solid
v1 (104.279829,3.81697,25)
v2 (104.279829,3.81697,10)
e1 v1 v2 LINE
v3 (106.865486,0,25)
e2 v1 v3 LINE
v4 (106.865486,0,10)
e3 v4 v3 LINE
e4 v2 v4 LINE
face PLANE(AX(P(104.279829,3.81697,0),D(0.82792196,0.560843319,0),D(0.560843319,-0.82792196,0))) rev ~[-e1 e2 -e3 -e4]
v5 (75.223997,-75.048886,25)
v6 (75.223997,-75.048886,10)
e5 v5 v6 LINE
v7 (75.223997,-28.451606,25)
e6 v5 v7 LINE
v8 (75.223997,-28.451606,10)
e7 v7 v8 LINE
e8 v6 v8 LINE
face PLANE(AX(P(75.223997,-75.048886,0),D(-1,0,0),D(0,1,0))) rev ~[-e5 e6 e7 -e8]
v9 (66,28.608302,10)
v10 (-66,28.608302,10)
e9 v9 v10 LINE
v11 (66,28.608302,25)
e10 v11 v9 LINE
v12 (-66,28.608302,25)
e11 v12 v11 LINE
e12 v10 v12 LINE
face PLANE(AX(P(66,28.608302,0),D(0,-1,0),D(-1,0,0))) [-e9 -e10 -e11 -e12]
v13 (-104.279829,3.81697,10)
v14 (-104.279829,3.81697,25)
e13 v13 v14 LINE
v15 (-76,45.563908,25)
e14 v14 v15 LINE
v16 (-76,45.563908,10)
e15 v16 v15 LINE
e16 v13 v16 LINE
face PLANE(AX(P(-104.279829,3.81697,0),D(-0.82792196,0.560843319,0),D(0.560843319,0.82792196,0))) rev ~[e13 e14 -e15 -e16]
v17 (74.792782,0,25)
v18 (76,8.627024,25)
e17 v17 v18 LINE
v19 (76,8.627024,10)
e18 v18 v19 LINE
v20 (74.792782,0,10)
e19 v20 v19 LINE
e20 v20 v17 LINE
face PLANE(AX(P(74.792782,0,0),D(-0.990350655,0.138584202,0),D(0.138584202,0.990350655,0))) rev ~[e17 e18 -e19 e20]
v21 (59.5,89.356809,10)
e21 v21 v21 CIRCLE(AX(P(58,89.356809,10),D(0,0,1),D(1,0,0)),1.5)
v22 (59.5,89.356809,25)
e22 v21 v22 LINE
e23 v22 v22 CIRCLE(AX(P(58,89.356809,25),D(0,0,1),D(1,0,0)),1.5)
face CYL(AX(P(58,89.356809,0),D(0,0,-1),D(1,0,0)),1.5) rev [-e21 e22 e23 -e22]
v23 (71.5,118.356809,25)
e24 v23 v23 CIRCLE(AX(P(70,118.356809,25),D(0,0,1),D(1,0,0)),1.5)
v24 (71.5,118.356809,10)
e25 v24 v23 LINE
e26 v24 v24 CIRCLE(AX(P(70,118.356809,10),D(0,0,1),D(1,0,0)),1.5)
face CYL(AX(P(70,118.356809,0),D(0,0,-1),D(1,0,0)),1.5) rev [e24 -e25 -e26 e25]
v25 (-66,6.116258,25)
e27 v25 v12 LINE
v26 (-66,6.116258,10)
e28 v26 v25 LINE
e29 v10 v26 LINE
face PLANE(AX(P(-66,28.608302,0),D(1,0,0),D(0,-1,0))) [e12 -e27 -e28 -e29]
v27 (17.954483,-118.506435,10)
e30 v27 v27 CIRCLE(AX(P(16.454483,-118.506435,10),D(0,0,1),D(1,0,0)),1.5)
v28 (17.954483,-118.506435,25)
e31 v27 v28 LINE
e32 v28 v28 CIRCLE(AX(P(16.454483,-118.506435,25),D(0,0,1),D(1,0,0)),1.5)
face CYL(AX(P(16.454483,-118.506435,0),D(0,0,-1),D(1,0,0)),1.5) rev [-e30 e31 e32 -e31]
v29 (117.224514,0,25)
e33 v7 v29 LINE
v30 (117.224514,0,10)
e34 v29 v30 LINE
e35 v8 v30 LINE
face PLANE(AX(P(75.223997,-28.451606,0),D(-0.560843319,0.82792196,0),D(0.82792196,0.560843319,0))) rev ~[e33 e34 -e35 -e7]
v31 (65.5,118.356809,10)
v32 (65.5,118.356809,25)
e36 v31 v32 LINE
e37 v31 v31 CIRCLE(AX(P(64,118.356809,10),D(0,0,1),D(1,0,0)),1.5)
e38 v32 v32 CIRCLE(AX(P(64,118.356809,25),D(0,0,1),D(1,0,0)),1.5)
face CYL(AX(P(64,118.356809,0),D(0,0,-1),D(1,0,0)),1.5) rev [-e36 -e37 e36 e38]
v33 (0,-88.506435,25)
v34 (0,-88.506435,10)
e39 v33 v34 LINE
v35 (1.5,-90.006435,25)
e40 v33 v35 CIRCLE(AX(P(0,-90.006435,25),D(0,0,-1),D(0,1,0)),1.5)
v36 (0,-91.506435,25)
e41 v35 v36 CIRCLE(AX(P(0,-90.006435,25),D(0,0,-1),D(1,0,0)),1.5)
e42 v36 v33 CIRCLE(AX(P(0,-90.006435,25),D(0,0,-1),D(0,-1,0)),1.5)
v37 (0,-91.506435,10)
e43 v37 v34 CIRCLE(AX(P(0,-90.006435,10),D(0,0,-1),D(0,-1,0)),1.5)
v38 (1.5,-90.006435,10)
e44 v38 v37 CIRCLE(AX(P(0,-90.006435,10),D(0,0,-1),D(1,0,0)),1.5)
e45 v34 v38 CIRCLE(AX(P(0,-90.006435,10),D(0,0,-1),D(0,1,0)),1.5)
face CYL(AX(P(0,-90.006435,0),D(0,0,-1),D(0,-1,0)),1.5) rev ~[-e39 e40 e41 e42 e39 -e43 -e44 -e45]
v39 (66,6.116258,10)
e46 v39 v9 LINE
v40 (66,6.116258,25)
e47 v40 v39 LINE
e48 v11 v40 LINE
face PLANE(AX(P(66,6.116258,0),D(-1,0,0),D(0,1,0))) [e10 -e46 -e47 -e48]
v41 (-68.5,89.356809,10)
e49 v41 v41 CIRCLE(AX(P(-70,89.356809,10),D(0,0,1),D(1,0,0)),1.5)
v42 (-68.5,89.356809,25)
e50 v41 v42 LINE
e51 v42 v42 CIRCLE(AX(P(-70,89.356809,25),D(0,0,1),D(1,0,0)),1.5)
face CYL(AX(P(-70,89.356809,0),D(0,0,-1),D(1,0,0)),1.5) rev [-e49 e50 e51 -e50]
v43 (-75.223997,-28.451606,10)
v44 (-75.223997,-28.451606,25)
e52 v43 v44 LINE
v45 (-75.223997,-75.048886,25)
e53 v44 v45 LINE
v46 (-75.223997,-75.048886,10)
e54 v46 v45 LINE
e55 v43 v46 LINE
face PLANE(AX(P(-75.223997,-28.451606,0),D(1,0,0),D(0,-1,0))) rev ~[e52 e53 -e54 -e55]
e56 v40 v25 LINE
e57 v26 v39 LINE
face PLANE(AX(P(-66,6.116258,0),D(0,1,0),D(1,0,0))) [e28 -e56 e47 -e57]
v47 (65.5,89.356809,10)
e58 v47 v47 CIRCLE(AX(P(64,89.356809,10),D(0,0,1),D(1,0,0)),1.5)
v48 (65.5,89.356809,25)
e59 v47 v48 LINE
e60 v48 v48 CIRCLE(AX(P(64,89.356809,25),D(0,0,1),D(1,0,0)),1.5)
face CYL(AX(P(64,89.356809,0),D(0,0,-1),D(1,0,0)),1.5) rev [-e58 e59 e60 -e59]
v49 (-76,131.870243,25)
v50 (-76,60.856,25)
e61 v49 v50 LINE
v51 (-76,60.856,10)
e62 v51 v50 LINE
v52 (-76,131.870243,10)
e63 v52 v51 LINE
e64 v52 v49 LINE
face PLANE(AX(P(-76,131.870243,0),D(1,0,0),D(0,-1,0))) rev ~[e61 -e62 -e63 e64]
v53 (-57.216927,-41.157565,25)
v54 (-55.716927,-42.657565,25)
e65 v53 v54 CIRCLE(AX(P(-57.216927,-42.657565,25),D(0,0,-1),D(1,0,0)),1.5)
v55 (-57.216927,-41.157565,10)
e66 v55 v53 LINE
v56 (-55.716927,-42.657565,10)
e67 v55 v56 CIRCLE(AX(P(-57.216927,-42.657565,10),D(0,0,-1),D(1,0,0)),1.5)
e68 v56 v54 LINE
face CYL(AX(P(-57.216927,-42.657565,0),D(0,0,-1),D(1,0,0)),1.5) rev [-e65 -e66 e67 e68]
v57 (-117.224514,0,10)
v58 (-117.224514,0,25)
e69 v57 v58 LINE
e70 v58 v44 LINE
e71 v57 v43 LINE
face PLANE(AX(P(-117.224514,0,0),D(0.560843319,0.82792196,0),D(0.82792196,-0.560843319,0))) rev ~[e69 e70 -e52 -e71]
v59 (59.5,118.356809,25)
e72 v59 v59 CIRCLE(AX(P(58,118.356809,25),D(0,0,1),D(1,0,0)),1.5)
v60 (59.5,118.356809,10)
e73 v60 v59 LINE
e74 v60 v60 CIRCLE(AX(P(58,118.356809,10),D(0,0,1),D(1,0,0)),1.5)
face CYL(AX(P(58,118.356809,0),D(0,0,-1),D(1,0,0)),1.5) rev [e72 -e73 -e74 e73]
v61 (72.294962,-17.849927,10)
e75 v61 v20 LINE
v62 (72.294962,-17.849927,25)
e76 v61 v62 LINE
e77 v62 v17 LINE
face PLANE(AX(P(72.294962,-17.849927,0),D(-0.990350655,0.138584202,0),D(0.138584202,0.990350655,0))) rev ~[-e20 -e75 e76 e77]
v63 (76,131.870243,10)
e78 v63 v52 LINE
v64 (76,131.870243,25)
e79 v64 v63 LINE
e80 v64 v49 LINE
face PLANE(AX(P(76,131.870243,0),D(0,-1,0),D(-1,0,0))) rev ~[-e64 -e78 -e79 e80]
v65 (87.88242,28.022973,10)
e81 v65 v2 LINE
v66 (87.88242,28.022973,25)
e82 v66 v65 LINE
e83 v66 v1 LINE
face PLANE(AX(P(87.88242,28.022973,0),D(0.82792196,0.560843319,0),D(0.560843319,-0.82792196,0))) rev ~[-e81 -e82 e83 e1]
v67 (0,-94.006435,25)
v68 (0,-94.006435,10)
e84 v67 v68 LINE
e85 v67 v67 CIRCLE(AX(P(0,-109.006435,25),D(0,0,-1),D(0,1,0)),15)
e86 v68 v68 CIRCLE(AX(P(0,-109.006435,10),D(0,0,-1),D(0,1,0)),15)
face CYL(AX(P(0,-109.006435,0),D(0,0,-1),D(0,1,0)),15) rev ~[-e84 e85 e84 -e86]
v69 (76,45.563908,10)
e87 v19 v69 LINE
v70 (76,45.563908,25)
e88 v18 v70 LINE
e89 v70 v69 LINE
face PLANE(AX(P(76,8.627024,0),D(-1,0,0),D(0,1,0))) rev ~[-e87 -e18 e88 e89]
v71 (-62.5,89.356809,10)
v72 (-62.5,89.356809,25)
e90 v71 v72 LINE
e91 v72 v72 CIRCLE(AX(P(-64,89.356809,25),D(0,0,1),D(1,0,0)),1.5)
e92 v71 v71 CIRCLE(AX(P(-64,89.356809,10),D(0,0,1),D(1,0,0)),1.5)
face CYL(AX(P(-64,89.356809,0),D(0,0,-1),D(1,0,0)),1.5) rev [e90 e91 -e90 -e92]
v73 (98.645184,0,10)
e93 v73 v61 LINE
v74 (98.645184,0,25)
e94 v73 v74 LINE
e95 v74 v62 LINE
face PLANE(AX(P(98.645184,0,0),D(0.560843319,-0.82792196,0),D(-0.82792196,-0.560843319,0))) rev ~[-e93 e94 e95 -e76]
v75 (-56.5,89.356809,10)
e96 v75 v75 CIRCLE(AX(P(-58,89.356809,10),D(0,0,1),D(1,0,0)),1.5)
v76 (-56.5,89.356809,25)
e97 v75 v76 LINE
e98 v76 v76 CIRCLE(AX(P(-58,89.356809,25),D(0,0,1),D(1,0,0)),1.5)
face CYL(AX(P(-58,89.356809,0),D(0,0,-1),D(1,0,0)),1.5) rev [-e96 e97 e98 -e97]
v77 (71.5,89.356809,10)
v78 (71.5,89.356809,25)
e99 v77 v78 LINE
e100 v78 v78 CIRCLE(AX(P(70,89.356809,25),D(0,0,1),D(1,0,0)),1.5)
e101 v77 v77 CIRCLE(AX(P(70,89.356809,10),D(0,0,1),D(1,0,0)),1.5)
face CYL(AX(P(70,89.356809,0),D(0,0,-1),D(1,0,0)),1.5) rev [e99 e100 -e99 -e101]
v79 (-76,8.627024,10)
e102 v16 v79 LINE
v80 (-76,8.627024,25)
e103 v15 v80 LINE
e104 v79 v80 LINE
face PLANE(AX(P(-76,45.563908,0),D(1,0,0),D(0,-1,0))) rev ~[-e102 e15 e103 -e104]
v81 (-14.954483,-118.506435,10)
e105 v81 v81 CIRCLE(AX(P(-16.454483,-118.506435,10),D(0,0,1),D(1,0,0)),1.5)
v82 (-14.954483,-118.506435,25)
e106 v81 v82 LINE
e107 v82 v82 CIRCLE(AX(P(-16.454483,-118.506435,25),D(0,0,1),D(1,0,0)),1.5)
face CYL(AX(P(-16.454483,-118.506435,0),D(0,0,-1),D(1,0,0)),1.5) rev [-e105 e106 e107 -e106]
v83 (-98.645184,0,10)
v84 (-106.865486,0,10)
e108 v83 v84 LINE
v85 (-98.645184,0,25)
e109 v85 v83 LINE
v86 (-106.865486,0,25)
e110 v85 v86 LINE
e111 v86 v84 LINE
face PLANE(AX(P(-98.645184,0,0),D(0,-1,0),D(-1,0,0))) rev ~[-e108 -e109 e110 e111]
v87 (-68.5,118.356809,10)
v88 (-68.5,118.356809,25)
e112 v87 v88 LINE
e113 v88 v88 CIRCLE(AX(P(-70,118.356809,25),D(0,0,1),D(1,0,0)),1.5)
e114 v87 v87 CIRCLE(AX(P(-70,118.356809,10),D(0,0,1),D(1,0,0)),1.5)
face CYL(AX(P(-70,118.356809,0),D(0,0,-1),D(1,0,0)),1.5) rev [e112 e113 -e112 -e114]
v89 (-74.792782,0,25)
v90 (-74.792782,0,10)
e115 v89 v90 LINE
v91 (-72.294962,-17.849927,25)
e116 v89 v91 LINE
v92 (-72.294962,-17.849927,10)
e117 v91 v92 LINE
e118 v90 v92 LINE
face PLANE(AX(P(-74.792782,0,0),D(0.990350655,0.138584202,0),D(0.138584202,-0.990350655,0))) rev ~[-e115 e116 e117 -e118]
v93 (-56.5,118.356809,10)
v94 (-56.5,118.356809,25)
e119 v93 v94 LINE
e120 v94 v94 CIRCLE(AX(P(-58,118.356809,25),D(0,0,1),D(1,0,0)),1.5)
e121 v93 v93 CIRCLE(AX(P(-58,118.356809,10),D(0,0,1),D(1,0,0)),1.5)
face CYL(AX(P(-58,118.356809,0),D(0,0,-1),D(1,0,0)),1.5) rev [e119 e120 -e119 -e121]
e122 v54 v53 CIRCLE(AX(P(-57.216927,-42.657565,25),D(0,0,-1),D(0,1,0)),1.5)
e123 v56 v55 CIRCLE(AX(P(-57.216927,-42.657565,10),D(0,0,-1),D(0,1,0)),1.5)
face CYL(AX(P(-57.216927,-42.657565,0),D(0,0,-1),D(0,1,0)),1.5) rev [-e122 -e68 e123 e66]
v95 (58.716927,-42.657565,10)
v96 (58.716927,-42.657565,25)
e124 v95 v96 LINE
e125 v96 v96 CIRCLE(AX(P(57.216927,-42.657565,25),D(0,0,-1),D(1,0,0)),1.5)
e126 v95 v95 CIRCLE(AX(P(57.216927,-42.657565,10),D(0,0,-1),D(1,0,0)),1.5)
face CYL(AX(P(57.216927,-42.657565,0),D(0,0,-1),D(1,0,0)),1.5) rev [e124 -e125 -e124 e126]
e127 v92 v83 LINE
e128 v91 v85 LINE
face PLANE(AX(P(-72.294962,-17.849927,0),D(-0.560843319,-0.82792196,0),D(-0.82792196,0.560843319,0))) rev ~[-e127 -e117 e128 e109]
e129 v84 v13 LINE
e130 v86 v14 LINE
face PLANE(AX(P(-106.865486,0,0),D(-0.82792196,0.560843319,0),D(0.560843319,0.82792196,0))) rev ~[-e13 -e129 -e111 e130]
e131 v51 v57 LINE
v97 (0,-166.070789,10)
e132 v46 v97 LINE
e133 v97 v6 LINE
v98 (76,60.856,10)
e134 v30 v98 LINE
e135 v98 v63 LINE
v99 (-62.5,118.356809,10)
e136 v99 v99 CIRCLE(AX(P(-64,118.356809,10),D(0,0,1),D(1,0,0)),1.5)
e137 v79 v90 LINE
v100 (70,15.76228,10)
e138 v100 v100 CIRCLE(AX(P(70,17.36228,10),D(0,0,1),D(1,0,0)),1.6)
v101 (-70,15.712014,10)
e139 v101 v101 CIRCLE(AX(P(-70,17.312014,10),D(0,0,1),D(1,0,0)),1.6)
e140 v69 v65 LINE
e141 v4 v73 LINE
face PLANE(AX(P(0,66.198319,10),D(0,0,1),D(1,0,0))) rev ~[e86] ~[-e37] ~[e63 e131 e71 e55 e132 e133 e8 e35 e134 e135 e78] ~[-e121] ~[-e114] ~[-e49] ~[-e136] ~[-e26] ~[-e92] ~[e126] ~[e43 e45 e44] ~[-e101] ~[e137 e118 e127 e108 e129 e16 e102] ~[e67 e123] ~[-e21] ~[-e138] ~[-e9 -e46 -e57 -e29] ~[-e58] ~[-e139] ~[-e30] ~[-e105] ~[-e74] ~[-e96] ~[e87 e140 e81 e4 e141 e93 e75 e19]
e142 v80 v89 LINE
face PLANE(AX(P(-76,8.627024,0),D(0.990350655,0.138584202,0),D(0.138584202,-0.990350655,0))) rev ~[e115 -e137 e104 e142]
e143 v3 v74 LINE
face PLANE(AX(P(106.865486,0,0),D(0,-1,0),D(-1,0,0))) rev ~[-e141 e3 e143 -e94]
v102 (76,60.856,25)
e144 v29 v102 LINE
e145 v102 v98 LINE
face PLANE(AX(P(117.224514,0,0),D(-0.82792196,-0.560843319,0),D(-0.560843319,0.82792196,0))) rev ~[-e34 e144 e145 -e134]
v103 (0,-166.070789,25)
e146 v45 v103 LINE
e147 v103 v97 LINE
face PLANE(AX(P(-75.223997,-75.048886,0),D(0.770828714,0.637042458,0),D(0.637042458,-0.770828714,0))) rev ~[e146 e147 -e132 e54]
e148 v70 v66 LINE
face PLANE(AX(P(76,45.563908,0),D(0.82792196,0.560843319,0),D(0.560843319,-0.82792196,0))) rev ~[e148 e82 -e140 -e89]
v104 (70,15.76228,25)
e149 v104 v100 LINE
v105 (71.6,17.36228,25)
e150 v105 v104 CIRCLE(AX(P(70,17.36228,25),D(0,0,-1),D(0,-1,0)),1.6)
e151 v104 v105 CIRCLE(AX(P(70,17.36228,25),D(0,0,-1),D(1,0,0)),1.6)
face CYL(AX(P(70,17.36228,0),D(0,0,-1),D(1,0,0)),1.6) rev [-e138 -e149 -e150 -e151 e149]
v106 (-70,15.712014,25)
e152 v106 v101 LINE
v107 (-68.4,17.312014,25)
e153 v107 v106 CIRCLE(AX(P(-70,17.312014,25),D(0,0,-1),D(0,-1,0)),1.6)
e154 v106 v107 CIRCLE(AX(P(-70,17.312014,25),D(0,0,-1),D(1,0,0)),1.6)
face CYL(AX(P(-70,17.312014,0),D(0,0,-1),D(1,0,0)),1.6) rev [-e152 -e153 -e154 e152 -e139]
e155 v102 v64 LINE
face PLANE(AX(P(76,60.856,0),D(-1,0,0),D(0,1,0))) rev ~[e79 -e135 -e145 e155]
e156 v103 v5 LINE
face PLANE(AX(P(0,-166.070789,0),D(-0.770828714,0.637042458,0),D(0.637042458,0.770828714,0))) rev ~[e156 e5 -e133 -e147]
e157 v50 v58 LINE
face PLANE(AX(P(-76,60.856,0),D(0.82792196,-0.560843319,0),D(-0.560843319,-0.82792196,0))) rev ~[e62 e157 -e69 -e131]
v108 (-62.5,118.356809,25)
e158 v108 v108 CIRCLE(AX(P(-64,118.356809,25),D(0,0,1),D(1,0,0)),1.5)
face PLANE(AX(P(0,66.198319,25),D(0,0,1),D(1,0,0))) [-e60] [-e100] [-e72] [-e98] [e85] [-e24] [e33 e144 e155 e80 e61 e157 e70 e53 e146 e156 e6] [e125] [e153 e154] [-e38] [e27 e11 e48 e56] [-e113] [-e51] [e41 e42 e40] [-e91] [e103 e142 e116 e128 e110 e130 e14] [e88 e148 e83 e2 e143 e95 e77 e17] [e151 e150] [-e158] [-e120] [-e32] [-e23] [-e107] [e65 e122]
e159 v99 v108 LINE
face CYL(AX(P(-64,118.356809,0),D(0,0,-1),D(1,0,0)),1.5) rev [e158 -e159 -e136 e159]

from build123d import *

# Parameters (mm, degrees)
F0_R      = 1.5
F1_DEPTH  = 5
F2_DEPTH  = 25
F3_DEPTH  = 25
F5_DEPTH  = 93
F6_DEPTH  = 8
F8_DEPTH  = 126
F7_R      = 1.5
F9_DEPTH  = 51.9
F10_DEPTH = 5
F11_DEPTH = 123
F12_DEPTH = 10


with BuildPart() as f1:
    # F0 (on Top) → F1 (new body)
    with BuildSketch(Plane.XY):
        Polygon((76, 118.35680902), (76, 131.8702431194), (-76, 131.8702431194), (-76, 60.855999589), (-76, 45.5639077712), (-76, 8.6270240996), (-74.7927818864, 0), (0, 0), (74.7927818864, 0), (76, 8.6270240996), (76, 45.5639077712), (76, 60.855999589), align=None)
        with Locations((-70, 89.35680902)):
            Circle(F0_R, mode=Mode.SUBTRACT)
        with Locations((-64, 89.35680902)):
            Circle(F0_R, mode=Mode.SUBTRACT)
        with Locations((-70, 118.35680902)):
            Circle(F0_R, mode=Mode.SUBTRACT)
        with Locations((-64, 118.35680902)):
            Circle(F0_R, mode=Mode.SUBTRACT)
        with Locations((-58, 89.35680902)):
            Circle(F0_R, mode=Mode.SUBTRACT)
        with Locations((-58, 118.35680902)):
            Circle(F0_R, mode=Mode.SUBTRACT)
        with Locations((58, 89.35680902)):
            Circle(F0_R, mode=Mode.SUBTRACT)
        with Locations((58, 118.35680902)):
            Circle(F0_R, mode=Mode.SUBTRACT)
        with Locations((64, 89.35680902)):
            Circle(F0_R, mode=Mode.SUBTRACT)
        with Locations((70, 89.35680902)):
            Circle(F0_R, mode=Mode.SUBTRACT)
        with Locations((64, 118.35680902)):
            Circle(F0_R, mode=Mode.SUBTRACT)
        with Locations((70, 118.35680902)):
            Circle(F0_R, mode=Mode.SUBTRACT)
        Polygon((-76, 45.5639077712), (-76, 60.855999589), (-117.2245144844, 0), (-106.865485549, 0), (-104.2798289376, 3.8169695785), align=None)
        Polygon((117.2245144844, 0), (76, 60.855999589), (76, 45.5639077712), (87.8824198706, 28.022972534), (104.2798289376, 3.8169695785), (106.865485549, 0), align=None)
        with BuildLine():
            Line((-106.865485549, 0), (-117.2245144844, 0))
            Line((-117.2245144844, 0), (-75.2239967593, -28.4516064646))
            Line((-75.2239967593, -28.4516064646), (-75.2239967593, -75.0488862395))
            Line((-75.2239967593, -75.0488862395), (0, -166.0707890987))
            Line((0, -166.0707890987), (0, -124.006434679))
            ThreePointArc((0, -124.006434679), (-15, -109.006434679), (0, -94.006434679))
            Line((0, -94.006434679), (0, -91.506434679))
            ThreePointArc((0, -91.506434679), (-1.5, -90.006434679), (0, -88.506434679))
            Line((0, -88.506434679), (0, -73.5419392586))
            Line((0, -73.5419392586), (0, 0))
            Line((0, 0), (-74.7927818864, 0))
            Line((-74.7927818864, 0), (-72.2949617347, -17.8499265401))
            Line((-72.2949617347, -17.8499265401), (-98.6451840666, 0))
            Line((-98.6451840666, 0), (-106.865485549, 0))
        make_face()
        with Locations((-16.4544826719, -118.506434679)):
            Circle(F0_R, mode=Mode.SUBTRACT)
        with BuildLine():
            Line((75.2239967593, -28.4516064646), (117.2245144844, 0))
            Line((117.2245144844, 0), (106.865485549, 0))
            Line((106.865485549, 0), (98.6451840666, 0))
            Line((98.6451840666, 0), (72.2949617347, -17.8499265401))
            Line((72.2949617347, -17.8499265401), (74.7927818864, 0))
            Line((74.7927818864, 0), (0, 0))
            Line((0, 0), (0, -73.5419392586))
            Line((0, -73.5419392586), (0, -88.506434679))
            ThreePointArc((0, -88.506434679), (1.0606601718, -88.9457745073), (1.5, -90.006434679))
            ThreePointArc((1.5, -90.006434679), (1.0606601718, -91.0670948508), (0, -91.506434679))
            Line((0, -91.506434679), (0, -94.006434679))
            ThreePointArc((0, -94.006434679), (10.6066017178, -98.3998329612), (15, -109.006434679))
            ThreePointArc((15, -109.006434679), (10.6066017178, -119.6130363968), (0, -124.006434679))
            Line((0, -124.006434679), (0, -166.0707890987))
            Line((0, -166.0707890987), (75.2239967593, -75.0488862395))
            Line((75.2239967593, -75.0488862395), (75.2239967593, -28.4516064646))
        make_face()
        with Locations((16.4544826719, -118.506434679)):
            Circle(F0_R, mode=Mode.SUBTRACT)
    extrude(amount=F1_DEPTH)

    # F0 (on Top) → F2 (join)
    with BuildSketch(Plane.XY):
        Polygon((76, 118.35680902), (76, 131.8702431194), (-76, 131.8702431194), (-76, 60.855999589), (-76, 45.5639077712), (-76, 8.6270240996), (-74.7927818864, 0), (0, 0), (74.7927818864, 0), (76, 8.6270240996), (76, 45.5639077712), (76, 60.855999589), align=None)
        with Locations((-70, 89.35680902)):
            Circle(F0_R, mode=Mode.SUBTRACT)
        with Locations((-64, 89.35680902)):
            Circle(F0_R, mode=Mode.SUBTRACT)
        with Locations((-70, 118.35680902)):
            Circle(F0_R, mode=Mode.SUBTRACT)
        with Locations((-64, 118.35680902)):
            Circle(F0_R, mode=Mode.SUBTRACT)
        with Locations((-58, 89.35680902)):
            Circle(F0_R, mode=Mode.SUBTRACT)
        with Locations((-58, 118.35680902)):
            Circle(F0_R, mode=Mode.SUBTRACT)
        with Locations((58, 89.35680902)):
            Circle(F0_R, mode=Mode.SUBTRACT)
        with Locations((58, 118.35680902)):
            Circle(F0_R, mode=Mode.SUBTRACT)
        with Locations((64, 89.35680902)):
            Circle(F0_R, mode=Mode.SUBTRACT)
        with Locations((70, 89.35680902)):
            Circle(F0_R, mode=Mode.SUBTRACT)
        with Locations((64, 118.35680902)):
            Circle(F0_R, mode=Mode.SUBTRACT)
        with Locations((70, 118.35680902)):
            Circle(F0_R, mode=Mode.SUBTRACT)
        Polygon((-76, 45.5639077712), (-76, 60.855999589), (-117.2245144844, 0), (-106.865485549, 0), (-104.2798289376, 3.8169695785), align=None)
        Polygon((117.2245144844, 0), (76, 60.855999589), (76, 45.5639077712), (87.8824198706, 28.022972534), (104.2798289376, 3.8169695785), (106.865485549, 0), align=None)
        with BuildLine():
            Line((-106.865485549, 0), (-117.2245144844, 0))
            Line((-117.2245144844, 0), (-75.2239967593, -28.4516064646))
            Line((-75.2239967593, -28.4516064646), (-75.2239967593, -75.0488862395))
            Line((-75.2239967593, -75.0488862395), (0, -166.0707890987))
            Line((0, -166.0707890987), (0, -124.006434679))
            ThreePointArc((0, -124.006434679), (-15, -109.006434679), (0, -94.006434679))
            Line((0, -94.006434679), (0, -91.506434679))
            ThreePointArc((0, -91.506434679), (-1.5, -90.006434679), (0, -88.506434679))
            Line((0, -88.506434679), (0, -73.5419392586))
            Line((0, -73.5419392586), (0, 0))
            Line((0, 0), (-74.7927818864, 0))
            Line((-74.7927818864, 0), (-72.2949617347, -17.8499265401))
            Line((-72.2949617347, -17.8499265401), (-98.6451840666, 0))
            Line((-98.6451840666, 0), (-106.865485549, 0))
        make_face()
        with Locations((-16.4544826719, -118.506434679)):
            Circle(F0_R, mode=Mode.SUBTRACT)
        with BuildLine():
            Line((75.2239967593, -28.4516064646), (117.2245144844, 0))
            Line((117.2245144844, 0), (106.865485549, 0))
            Line((106.865485549, 0), (98.6451840666, 0))
            Line((98.6451840666, 0), (72.2949617347, -17.8499265401))
            Line((72.2949617347, -17.8499265401), (74.7927818864, 0))
            Line((74.7927818864, 0), (0, 0))
            Line((0, 0), (0, -73.5419392586))
            Line((0, -73.5419392586), (0, -88.506434679))
            ThreePointArc((0, -88.506434679), (1.0606601718, -88.9457745073), (1.5, -90.006434679))
            ThreePointArc((1.5, -90.006434679), (1.0606601718, -91.0670948508), (0, -91.506434679))
            Line((0, -91.506434679), (0, -94.006434679))
            ThreePointArc((0, -94.006434679), (10.6066017178, -98.3998329612), (15, -109.006434679))
            ThreePointArc((15, -109.006434679), (10.6066017178, -119.6130363968), (0, -124.006434679))
            Line((0, -124.006434679), (0, -166.0707890987))
            Line((0, -166.0707890987), (75.2239967593, -75.0488862395))
            Line((75.2239967593, -75.0488862395), (75.2239967593, -28.4516064646))
        make_face()
        with Locations((16.4544826719, -118.506434679)):
            Circle(F0_R, mode=Mode.SUBTRACT)
    extrude(amount=F2_DEPTH)

    # F0 (on Top) → F3 (join)
    with BuildSketch(Plane.XY):
        Polygon((76, 118.35680902), (76, 131.8702431194), (-76, 131.8702431194), (-76, 60.855999589), (-76, 45.5639077712), (-76, 8.6270240996), (-74.7927818864, 0), (0, 0), (74.7927818864, 0), (76, 8.6270240996), (76, 45.5639077712), (76, 60.855999589), align=None)
        with Locations((-70, 89.35680902)):
            Circle(F0_R, mode=Mode.SUBTRACT)
        with Locations((-64, 89.35680902)):
            Circle(F0_R, mode=Mode.SUBTRACT)
        with Locations((-70, 118.35680902)):
            Circle(F0_R, mode=Mode.SUBTRACT)
        with Locations((-64, 118.35680902)):
            Circle(F0_R, mode=Mode.SUBTRACT)
        with Locations((-58, 89.35680902)):
            Circle(F0_R, mode=Mode.SUBTRACT)
        with Locations((-58, 118.35680902)):
            Circle(F0_R, mode=Mode.SUBTRACT)
        with Locations((58, 89.35680902)):
            Circle(F0_R, mode=Mode.SUBTRACT)
        with Locations((58, 118.35680902)):
            Circle(F0_R, mode=Mode.SUBTRACT)
        with Locations((64, 89.35680902)):
            Circle(F0_R, mode=Mode.SUBTRACT)
        with Locations((70, 89.35680902)):
            Circle(F0_R, mode=Mode.SUBTRACT)
        with Locations((64, 118.35680902)):
            Circle(F0_R, mode=Mode.SUBTRACT)
        with Locations((70, 118.35680902)):
            Circle(F0_R, mode=Mode.SUBTRACT)
        Polygon((-76, 45.5639077712), (-76, 60.855999589), (-117.2245144844, 0), (-106.865485549, 0), (-104.2798289376, 3.8169695785), align=None)
        Polygon((117.2245144844, 0), (76, 60.855999589), (76, 45.5639077712), (87.8824198706, 28.022972534), (104.2798289376, 3.8169695785), (106.865485549, 0), align=None)
        with BuildLine():
            Line((-106.865485549, 0), (-117.2245144844, 0))
            Line((-117.2245144844, 0), (-75.2239967593, -28.4516064646))
            Line((-75.2239967593, -28.4516064646), (-75.2239967593, -75.0488862395))
            Line((-75.2239967593, -75.0488862395), (0, -166.0707890987))
            Line((0, -166.0707890987), (0, -124.006434679))
            ThreePointArc((0, -124.006434679), (-15, -109.006434679), (0, -94.006434679))
            Line((0, -94.006434679), (0, -91.506434679))
            ThreePointArc((0, -91.506434679), (-1.5, -90.006434679), (0, -88.506434679))
            Line((0, -88.506434679), (0, -73.5419392586))
            Line((0, -73.5419392586), (0, 0))
            Line((0, 0), (-74.7927818864, 0))
            Line((-74.7927818864, 0), (-72.2949617347, -17.8499265401))
            Line((-72.2949617347, -17.8499265401), (-98.6451840666, 0))
            Line((-98.6451840666, 0), (-106.865485549, 0))
        make_face()
        with Locations((-16.4544826719, -118.506434679)):
            Circle(F0_R, mode=Mode.SUBTRACT)
        with BuildLine():
            Line((75.2239967593, -28.4516064646), (117.2245144844, 0))
            Line((117.2245144844, 0), (106.865485549, 0))
            Line((106.865485549, 0), (98.6451840666, 0))
            Line((98.6451840666, 0), (72.2949617347, -17.8499265401))
            Line((72.2949617347, -17.8499265401), (74.7927818864, 0))
            Line((74.7927818864, 0), (0, 0))
            Line((0, 0), (0, -73.5419392586))
            Line((0, -73.5419392586), (0, -88.506434679))
            ThreePointArc((0, -88.506434679), (1.0606601718, -88.9457745073), (1.5, -90.006434679))
            ThreePointArc((1.5, -90.006434679), (1.0606601718, -91.0670948508), (0, -91.506434679))
            Line((0, -91.506434679), (0, -94.006434679))
            ThreePointArc((0, -94.006434679), (10.6066017178, -98.3998329612), (15, -109.006434679))
            ThreePointArc((15, -109.006434679), (10.6066017178, -119.6130363968), (0, -124.006434679))
            Line((0, -124.006434679), (0, -166.0707890987))
            Line((0, -166.0707890987), (75.2239967593, -75.0488862395))
            Line((75.2239967593, -75.0488862395), (75.2239967593, -28.4516064646))
        make_face()
        with Locations((16.4544826719, -118.506434679)):
            Circle(F0_R, mode=Mode.SUBTRACT)
    extrude(amount=F3_DEPTH)

    # F4 (on Top) → F5 (cut)
    with BuildSketch(Plane.XY):
        Polygon((-66, 28.6083016545), (-66, 6.1162575148), (-49.9165579677, 6.1162575148), (66, 6.1162575148), (66, 28.6083016545), align=None)
        with BuildLine():
            ThreePointArc((70, 15.7622795846), (71.1313708499, 16.2309087347), (71.6, 17.3622795846))
            ThreePointArc((71.6, 17.3622795846), (68.8686291501, 18.4936504345), (70, 15.7622795846))
        make_face()
        with BuildLine():
            ThreePointArc((-70, 15.7120144755), (-68.8686291501, 16.1806436256), (-68.4, 17.3120144755))
            ThreePointArc((-68.4, 17.3120144755), (-71.1313708499, 18.4433853254), (-70, 15.7120144755))
        make_face()
    extrude(amount=F5_DEPTH, mode=Mode.SUBTRACT)

    # F0 (on Top) → F6 (join)
    with BuildSketch(Plane.XY):
        Polygon((76, 118.35680902), (76, 131.8702431194), (-76, 131.8702431194), (-76, 60.855999589), (-76, 45.5639077712), (-76, 8.6270240996), (-74.7927818864, 0), (0, 0), (74.7927818864, 0), (76, 8.6270240996), (76, 45.5639077712), (76, 60.855999589), align=None)
        with Locations((-70, 89.35680902)):
            Circle(F0_R, mode=Mode.SUBTRACT)
        with Locations((-64, 89.35680902)):
            Circle(F0_R, mode=Mode.SUBTRACT)
        with Locations((-70, 118.35680902)):
            Circle(F0_R, mode=Mode.SUBTRACT)
        with Locations((-64, 118.35680902)):
            Circle(F0_R, mode=Mode.SUBTRACT)
        with Locations((-58, 89.35680902)):
            Circle(F0_R, mode=Mode.SUBTRACT)
        with Locations((-58, 118.35680902)):
            Circle(F0_R, mode=Mode.SUBTRACT)
        with Locations((58, 89.35680902)):
            Circle(F0_R, mode=Mode.SUBTRACT)
        with Locations((58, 118.35680902)):
            Circle(F0_R, mode=Mode.SUBTRACT)
        with Locations((64, 89.35680902)):
            Circle(F0_R, mode=Mode.SUBTRACT)
        with Locations((70, 89.35680902)):
            Circle(F0_R, mode=Mode.SUBTRACT)
        with Locations((64, 118.35680902)):
            Circle(F0_R, mode=Mode.SUBTRACT)
        with Locations((70, 118.35680902)):
            Circle(F0_R, mode=Mode.SUBTRACT)
        Polygon((-76, 45.5639077712), (-76, 60.855999589), (-117.2245144844, 0), (-106.865485549, 0), (-104.2798289376, 3.8169695785), align=None)
        Polygon((117.2245144844, 0), (76, 60.855999589), (76, 45.5639077712), (87.8824198706, 28.022972534), (104.2798289376, 3.8169695785), (106.865485549, 0), align=None)
        with BuildLine():
            Line((-106.865485549, 0), (-117.2245144844, 0))
            Line((-117.2245144844, 0), (-75.2239967593, -28.4516064646))
            Line((-75.2239967593, -28.4516064646), (-75.2239967593, -75.0488862395))
            Line((-75.2239967593, -75.0488862395), (0, -166.0707890987))
            Line((0, -166.0707890987), (0, -124.006434679))
            ThreePointArc((0, -124.006434679), (-15, -109.006434679), (0, -94.006434679))
            Line((0, -94.006434679), (0, -91.506434679))
            ThreePointArc((0, -91.506434679), (-1.5, -90.006434679), (0, -88.506434679))
            Line((0, -88.506434679), (0, -73.5419392586))
            Line((0, -73.5419392586), (0, 0))
            Line((0, 0), (-74.7927818864, 0))
            Line((-74.7927818864, 0), (-72.2949617347, -17.8499265401))
            Line((-72.2949617347, -17.8499265401), (-98.6451840666, 0))
            Line((-98.6451840666, 0), (-106.865485549, 0))
        make_face()
        with Locations((-16.4544826719, -118.506434679)):
            Circle(F0_R, mode=Mode.SUBTRACT)
        with BuildLine():
            Line((75.2239967593, -28.4516064646), (117.2245144844, 0))
            Line((117.2245144844, 0), (106.865485549, 0))
            Line((106.865485549, 0), (98.6451840666, 0))
            Line((98.6451840666, 0), (72.2949617347, -17.8499265401))
            Line((72.2949617347, -17.8499265401), (74.7927818864, 0))
            Line((74.7927818864, 0), (0, 0))
            Line((0, 0), (0, -73.5419392586))
            Line((0, -73.5419392586), (0, -88.506434679))
            ThreePointArc((0, -88.506434679), (1.0606601718, -88.9457745073), (1.5, -90.006434679))
            ThreePointArc((1.5, -90.006434679), (1.0606601718, -91.0670948508), (0, -91.506434679))
            Line((0, -91.506434679), (0, -94.006434679))
            ThreePointArc((0, -94.006434679), (10.6066017178, -98.3998329612), (15, -109.006434679))
            ThreePointArc((15, -109.006434679), (10.6066017178, -119.6130363968), (0, -124.006434679))
            Line((0, -124.006434679), (0, -166.0707890987))
            Line((0, -166.0707890987), (75.2239967593, -75.0488862395))
            Line((75.2239967593, -75.0488862395), (75.2239967593, -28.4516064646))
        make_face()
        with Locations((16.4544826719, -118.506434679)):
            Circle(F0_R, mode=Mode.SUBTRACT)
    extrude(amount=F6_DEPTH)

    # F4 (on Top) → F8 (cut)
    with BuildSketch(Plane.XY):
        Polygon((-66, 28.6083016545), (-66, 6.1162575148), (-49.9165579677, 6.1162575148), (66, 6.1162575148), (66, 28.6083016545), align=None)
        with BuildLine():
            ThreePointArc((70, 15.7622795846), (71.1313708499, 16.2309087347), (71.6, 17.3622795846))
            ThreePointArc((71.6, 17.3622795846), (68.8686291501, 18.4936504345), (70, 15.7622795846))
        make_face()
        with BuildLine():
            ThreePointArc((-70, 15.7120144755), (-68.8686291501, 16.1806436256), (-68.4, 17.3120144755))
            ThreePointArc((-68.4, 17.3120144755), (-71.1313708499, 18.4433853254), (-70, 15.7120144755))
        make_face()
    extrude(amount=F8_DEPTH, mode=Mode.SUBTRACT)

    # F7 (on Top) → F9 (cut)
    with BuildSketch(Plane.XY):
        with BuildLine():
            ThreePointArc((-57.2169274092, -41.1575653255), (-58.277587581, -43.7182254973), (-55.7169274092, -42.6575653255))
            ThreePointArc((-55.7169274092, -42.6575653255), (-56.1562672374, -41.5969051537), (-57.2169274092, -41.1575653255))
        make_face()
        with Locations((57.2169274092, -42.6575653255)):
            Circle(F7_R)
    extrude(amount=F9_DEPTH, mode=Mode.SUBTRACT)

    # F0 (on Top) → F10 (join)
    with BuildSketch(Plane.XY):
        Polygon((76, 118.35680902), (76, 131.8702431194), (-76, 131.8702431194), (-76, 60.855999589), (-76, 45.5639077712), (-76, 8.6270240996), (-74.7927818864, 0), (0, 0), (74.7927818864, 0), (76, 8.6270240996), (76, 45.5639077712), (76, 60.855999589), align=None)
        with Locations((-70, 89.35680902)):
            Circle(F0_R, mode=Mode.SUBTRACT)
        with Locations((-64, 89.35680902)):
            Circle(F0_R, mode=Mode.SUBTRACT)
        with Locations((-70, 118.35680902)):
            Circle(F0_R, mode=Mode.SUBTRACT)
        with Locations((-64, 118.35680902)):
            Circle(F0_R, mode=Mode.SUBTRACT)
        with Locations((-58, 89.35680902)):
            Circle(F0_R, mode=Mode.SUBTRACT)
        with Locations((-58, 118.35680902)):
            Circle(F0_R, mode=Mode.SUBTRACT)
        with Locations((58, 89.35680902)):
            Circle(F0_R, mode=Mode.SUBTRACT)
        with Locations((58, 118.35680902)):
            Circle(F0_R, mode=Mode.SUBTRACT)
        with Locations((64, 89.35680902)):
            Circle(F0_R, mode=Mode.SUBTRACT)
        with Locations((70, 89.35680902)):
            Circle(F0_R, mode=Mode.SUBTRACT)
        with Locations((64, 118.35680902)):
            Circle(F0_R, mode=Mode.SUBTRACT)
        with Locations((70, 118.35680902)):
            Circle(F0_R, mode=Mode.SUBTRACT)
        Polygon((-76, 45.5639077712), (-76, 60.855999589), (-117.2245144844, 0), (-106.865485549, 0), (-104.2798289376, 3.8169695785), align=None)
        Polygon((117.2245144844, 0), (76, 60.855999589), (76, 45.5639077712), (87.8824198706, 28.022972534), (104.2798289376, 3.8169695785), (106.865485549, 0), align=None)
        with BuildLine():
            Line((-106.865485549, 0), (-117.2245144844, 0))
            Line((-117.2245144844, 0), (-75.2239967593, -28.4516064646))
            Line((-75.2239967593, -28.4516064646), (-75.2239967593, -75.0488862395))
            Line((-75.2239967593, -75.0488862395), (0, -166.0707890987))
            Line((0, -166.0707890987), (0, -124.006434679))
            ThreePointArc((0, -124.006434679), (-15, -109.006434679), (0, -94.006434679))
            Line((0, -94.006434679), (0, -91.506434679))
            ThreePointArc((0, -91.506434679), (-1.5, -90.006434679), (0, -88.506434679))
            Line((0, -88.506434679), (0, -73.5419392586))
            Line((0, -73.5419392586), (0, 0))
            Line((0, 0), (-74.7927818864, 0))
            Line((-74.7927818864, 0), (-72.2949617347, -17.8499265401))
            Line((-72.2949617347, -17.8499265401), (-98.6451840666, 0))
            Line((-98.6451840666, 0), (-106.865485549, 0))
        make_face()
        with Locations((-16.4544826719, -118.506434679)):
            Circle(F0_R, mode=Mode.SUBTRACT)
        with BuildLine():
            Line((75.2239967593, -28.4516064646), (117.2245144844, 0))
            Line((117.2245144844, 0), (106.865485549, 0))
            Line((106.865485549, 0), (98.6451840666, 0))
            Line((98.6451840666, 0), (72.2949617347, -17.8499265401))
            Line((72.2949617347, -17.8499265401), (74.7927818864, 0))
            Line((74.7927818864, 0), (0, 0))
            Line((0, 0), (0, -73.5419392586))
            Line((0, -73.5419392586), (0, -88.506434679))
            ThreePointArc((0, -88.506434679), (1.0606601718, -88.9457745073), (1.5, -90.006434679))
            ThreePointArc((1.5, -90.006434679), (1.0606601718, -91.0670948508), (0, -91.506434679))
            Line((0, -91.506434679), (0, -94.006434679))
            ThreePointArc((0, -94.006434679), (10.6066017178, -98.3998329612), (15, -109.006434679))
            ThreePointArc((15, -109.006434679), (10.6066017178, -119.6130363968), (0, -124.006434679))
            Line((0, -124.006434679), (0, -166.0707890987))
            Line((0, -166.0707890987), (75.2239967593, -75.0488862395))
            Line((75.2239967593, -75.0488862395), (75.2239967593, -28.4516064646))
        make_face()
        with Locations((16.4544826719, -118.506434679)):
            Circle(F0_R, mode=Mode.SUBTRACT)
    extrude(amount=F10_DEPTH)

    # F11 (cut): faces of the model
    f11_faces = [f1.faces().sort_by_distance(p)[0] for p in [
        (70, 17.3622795846, 5),
        (0, 17.3622795846, 5),
        (-70, 17.3120144755, 5),
    ]]
    extrude(f11_faces, amount=-F11_DEPTH, mode=Mode.SUBTRACT)

    # F12 (cut): a face of the model
    f12_faces = [f1.faces().sort_by_distance(p)[0] for p in [
        (0, 5.9527027765, 0),
    ]]
    extrude(f12_faces, amount=-F12_DEPTH, mode=Mode.SUBTRACT)


solid = f1.part
